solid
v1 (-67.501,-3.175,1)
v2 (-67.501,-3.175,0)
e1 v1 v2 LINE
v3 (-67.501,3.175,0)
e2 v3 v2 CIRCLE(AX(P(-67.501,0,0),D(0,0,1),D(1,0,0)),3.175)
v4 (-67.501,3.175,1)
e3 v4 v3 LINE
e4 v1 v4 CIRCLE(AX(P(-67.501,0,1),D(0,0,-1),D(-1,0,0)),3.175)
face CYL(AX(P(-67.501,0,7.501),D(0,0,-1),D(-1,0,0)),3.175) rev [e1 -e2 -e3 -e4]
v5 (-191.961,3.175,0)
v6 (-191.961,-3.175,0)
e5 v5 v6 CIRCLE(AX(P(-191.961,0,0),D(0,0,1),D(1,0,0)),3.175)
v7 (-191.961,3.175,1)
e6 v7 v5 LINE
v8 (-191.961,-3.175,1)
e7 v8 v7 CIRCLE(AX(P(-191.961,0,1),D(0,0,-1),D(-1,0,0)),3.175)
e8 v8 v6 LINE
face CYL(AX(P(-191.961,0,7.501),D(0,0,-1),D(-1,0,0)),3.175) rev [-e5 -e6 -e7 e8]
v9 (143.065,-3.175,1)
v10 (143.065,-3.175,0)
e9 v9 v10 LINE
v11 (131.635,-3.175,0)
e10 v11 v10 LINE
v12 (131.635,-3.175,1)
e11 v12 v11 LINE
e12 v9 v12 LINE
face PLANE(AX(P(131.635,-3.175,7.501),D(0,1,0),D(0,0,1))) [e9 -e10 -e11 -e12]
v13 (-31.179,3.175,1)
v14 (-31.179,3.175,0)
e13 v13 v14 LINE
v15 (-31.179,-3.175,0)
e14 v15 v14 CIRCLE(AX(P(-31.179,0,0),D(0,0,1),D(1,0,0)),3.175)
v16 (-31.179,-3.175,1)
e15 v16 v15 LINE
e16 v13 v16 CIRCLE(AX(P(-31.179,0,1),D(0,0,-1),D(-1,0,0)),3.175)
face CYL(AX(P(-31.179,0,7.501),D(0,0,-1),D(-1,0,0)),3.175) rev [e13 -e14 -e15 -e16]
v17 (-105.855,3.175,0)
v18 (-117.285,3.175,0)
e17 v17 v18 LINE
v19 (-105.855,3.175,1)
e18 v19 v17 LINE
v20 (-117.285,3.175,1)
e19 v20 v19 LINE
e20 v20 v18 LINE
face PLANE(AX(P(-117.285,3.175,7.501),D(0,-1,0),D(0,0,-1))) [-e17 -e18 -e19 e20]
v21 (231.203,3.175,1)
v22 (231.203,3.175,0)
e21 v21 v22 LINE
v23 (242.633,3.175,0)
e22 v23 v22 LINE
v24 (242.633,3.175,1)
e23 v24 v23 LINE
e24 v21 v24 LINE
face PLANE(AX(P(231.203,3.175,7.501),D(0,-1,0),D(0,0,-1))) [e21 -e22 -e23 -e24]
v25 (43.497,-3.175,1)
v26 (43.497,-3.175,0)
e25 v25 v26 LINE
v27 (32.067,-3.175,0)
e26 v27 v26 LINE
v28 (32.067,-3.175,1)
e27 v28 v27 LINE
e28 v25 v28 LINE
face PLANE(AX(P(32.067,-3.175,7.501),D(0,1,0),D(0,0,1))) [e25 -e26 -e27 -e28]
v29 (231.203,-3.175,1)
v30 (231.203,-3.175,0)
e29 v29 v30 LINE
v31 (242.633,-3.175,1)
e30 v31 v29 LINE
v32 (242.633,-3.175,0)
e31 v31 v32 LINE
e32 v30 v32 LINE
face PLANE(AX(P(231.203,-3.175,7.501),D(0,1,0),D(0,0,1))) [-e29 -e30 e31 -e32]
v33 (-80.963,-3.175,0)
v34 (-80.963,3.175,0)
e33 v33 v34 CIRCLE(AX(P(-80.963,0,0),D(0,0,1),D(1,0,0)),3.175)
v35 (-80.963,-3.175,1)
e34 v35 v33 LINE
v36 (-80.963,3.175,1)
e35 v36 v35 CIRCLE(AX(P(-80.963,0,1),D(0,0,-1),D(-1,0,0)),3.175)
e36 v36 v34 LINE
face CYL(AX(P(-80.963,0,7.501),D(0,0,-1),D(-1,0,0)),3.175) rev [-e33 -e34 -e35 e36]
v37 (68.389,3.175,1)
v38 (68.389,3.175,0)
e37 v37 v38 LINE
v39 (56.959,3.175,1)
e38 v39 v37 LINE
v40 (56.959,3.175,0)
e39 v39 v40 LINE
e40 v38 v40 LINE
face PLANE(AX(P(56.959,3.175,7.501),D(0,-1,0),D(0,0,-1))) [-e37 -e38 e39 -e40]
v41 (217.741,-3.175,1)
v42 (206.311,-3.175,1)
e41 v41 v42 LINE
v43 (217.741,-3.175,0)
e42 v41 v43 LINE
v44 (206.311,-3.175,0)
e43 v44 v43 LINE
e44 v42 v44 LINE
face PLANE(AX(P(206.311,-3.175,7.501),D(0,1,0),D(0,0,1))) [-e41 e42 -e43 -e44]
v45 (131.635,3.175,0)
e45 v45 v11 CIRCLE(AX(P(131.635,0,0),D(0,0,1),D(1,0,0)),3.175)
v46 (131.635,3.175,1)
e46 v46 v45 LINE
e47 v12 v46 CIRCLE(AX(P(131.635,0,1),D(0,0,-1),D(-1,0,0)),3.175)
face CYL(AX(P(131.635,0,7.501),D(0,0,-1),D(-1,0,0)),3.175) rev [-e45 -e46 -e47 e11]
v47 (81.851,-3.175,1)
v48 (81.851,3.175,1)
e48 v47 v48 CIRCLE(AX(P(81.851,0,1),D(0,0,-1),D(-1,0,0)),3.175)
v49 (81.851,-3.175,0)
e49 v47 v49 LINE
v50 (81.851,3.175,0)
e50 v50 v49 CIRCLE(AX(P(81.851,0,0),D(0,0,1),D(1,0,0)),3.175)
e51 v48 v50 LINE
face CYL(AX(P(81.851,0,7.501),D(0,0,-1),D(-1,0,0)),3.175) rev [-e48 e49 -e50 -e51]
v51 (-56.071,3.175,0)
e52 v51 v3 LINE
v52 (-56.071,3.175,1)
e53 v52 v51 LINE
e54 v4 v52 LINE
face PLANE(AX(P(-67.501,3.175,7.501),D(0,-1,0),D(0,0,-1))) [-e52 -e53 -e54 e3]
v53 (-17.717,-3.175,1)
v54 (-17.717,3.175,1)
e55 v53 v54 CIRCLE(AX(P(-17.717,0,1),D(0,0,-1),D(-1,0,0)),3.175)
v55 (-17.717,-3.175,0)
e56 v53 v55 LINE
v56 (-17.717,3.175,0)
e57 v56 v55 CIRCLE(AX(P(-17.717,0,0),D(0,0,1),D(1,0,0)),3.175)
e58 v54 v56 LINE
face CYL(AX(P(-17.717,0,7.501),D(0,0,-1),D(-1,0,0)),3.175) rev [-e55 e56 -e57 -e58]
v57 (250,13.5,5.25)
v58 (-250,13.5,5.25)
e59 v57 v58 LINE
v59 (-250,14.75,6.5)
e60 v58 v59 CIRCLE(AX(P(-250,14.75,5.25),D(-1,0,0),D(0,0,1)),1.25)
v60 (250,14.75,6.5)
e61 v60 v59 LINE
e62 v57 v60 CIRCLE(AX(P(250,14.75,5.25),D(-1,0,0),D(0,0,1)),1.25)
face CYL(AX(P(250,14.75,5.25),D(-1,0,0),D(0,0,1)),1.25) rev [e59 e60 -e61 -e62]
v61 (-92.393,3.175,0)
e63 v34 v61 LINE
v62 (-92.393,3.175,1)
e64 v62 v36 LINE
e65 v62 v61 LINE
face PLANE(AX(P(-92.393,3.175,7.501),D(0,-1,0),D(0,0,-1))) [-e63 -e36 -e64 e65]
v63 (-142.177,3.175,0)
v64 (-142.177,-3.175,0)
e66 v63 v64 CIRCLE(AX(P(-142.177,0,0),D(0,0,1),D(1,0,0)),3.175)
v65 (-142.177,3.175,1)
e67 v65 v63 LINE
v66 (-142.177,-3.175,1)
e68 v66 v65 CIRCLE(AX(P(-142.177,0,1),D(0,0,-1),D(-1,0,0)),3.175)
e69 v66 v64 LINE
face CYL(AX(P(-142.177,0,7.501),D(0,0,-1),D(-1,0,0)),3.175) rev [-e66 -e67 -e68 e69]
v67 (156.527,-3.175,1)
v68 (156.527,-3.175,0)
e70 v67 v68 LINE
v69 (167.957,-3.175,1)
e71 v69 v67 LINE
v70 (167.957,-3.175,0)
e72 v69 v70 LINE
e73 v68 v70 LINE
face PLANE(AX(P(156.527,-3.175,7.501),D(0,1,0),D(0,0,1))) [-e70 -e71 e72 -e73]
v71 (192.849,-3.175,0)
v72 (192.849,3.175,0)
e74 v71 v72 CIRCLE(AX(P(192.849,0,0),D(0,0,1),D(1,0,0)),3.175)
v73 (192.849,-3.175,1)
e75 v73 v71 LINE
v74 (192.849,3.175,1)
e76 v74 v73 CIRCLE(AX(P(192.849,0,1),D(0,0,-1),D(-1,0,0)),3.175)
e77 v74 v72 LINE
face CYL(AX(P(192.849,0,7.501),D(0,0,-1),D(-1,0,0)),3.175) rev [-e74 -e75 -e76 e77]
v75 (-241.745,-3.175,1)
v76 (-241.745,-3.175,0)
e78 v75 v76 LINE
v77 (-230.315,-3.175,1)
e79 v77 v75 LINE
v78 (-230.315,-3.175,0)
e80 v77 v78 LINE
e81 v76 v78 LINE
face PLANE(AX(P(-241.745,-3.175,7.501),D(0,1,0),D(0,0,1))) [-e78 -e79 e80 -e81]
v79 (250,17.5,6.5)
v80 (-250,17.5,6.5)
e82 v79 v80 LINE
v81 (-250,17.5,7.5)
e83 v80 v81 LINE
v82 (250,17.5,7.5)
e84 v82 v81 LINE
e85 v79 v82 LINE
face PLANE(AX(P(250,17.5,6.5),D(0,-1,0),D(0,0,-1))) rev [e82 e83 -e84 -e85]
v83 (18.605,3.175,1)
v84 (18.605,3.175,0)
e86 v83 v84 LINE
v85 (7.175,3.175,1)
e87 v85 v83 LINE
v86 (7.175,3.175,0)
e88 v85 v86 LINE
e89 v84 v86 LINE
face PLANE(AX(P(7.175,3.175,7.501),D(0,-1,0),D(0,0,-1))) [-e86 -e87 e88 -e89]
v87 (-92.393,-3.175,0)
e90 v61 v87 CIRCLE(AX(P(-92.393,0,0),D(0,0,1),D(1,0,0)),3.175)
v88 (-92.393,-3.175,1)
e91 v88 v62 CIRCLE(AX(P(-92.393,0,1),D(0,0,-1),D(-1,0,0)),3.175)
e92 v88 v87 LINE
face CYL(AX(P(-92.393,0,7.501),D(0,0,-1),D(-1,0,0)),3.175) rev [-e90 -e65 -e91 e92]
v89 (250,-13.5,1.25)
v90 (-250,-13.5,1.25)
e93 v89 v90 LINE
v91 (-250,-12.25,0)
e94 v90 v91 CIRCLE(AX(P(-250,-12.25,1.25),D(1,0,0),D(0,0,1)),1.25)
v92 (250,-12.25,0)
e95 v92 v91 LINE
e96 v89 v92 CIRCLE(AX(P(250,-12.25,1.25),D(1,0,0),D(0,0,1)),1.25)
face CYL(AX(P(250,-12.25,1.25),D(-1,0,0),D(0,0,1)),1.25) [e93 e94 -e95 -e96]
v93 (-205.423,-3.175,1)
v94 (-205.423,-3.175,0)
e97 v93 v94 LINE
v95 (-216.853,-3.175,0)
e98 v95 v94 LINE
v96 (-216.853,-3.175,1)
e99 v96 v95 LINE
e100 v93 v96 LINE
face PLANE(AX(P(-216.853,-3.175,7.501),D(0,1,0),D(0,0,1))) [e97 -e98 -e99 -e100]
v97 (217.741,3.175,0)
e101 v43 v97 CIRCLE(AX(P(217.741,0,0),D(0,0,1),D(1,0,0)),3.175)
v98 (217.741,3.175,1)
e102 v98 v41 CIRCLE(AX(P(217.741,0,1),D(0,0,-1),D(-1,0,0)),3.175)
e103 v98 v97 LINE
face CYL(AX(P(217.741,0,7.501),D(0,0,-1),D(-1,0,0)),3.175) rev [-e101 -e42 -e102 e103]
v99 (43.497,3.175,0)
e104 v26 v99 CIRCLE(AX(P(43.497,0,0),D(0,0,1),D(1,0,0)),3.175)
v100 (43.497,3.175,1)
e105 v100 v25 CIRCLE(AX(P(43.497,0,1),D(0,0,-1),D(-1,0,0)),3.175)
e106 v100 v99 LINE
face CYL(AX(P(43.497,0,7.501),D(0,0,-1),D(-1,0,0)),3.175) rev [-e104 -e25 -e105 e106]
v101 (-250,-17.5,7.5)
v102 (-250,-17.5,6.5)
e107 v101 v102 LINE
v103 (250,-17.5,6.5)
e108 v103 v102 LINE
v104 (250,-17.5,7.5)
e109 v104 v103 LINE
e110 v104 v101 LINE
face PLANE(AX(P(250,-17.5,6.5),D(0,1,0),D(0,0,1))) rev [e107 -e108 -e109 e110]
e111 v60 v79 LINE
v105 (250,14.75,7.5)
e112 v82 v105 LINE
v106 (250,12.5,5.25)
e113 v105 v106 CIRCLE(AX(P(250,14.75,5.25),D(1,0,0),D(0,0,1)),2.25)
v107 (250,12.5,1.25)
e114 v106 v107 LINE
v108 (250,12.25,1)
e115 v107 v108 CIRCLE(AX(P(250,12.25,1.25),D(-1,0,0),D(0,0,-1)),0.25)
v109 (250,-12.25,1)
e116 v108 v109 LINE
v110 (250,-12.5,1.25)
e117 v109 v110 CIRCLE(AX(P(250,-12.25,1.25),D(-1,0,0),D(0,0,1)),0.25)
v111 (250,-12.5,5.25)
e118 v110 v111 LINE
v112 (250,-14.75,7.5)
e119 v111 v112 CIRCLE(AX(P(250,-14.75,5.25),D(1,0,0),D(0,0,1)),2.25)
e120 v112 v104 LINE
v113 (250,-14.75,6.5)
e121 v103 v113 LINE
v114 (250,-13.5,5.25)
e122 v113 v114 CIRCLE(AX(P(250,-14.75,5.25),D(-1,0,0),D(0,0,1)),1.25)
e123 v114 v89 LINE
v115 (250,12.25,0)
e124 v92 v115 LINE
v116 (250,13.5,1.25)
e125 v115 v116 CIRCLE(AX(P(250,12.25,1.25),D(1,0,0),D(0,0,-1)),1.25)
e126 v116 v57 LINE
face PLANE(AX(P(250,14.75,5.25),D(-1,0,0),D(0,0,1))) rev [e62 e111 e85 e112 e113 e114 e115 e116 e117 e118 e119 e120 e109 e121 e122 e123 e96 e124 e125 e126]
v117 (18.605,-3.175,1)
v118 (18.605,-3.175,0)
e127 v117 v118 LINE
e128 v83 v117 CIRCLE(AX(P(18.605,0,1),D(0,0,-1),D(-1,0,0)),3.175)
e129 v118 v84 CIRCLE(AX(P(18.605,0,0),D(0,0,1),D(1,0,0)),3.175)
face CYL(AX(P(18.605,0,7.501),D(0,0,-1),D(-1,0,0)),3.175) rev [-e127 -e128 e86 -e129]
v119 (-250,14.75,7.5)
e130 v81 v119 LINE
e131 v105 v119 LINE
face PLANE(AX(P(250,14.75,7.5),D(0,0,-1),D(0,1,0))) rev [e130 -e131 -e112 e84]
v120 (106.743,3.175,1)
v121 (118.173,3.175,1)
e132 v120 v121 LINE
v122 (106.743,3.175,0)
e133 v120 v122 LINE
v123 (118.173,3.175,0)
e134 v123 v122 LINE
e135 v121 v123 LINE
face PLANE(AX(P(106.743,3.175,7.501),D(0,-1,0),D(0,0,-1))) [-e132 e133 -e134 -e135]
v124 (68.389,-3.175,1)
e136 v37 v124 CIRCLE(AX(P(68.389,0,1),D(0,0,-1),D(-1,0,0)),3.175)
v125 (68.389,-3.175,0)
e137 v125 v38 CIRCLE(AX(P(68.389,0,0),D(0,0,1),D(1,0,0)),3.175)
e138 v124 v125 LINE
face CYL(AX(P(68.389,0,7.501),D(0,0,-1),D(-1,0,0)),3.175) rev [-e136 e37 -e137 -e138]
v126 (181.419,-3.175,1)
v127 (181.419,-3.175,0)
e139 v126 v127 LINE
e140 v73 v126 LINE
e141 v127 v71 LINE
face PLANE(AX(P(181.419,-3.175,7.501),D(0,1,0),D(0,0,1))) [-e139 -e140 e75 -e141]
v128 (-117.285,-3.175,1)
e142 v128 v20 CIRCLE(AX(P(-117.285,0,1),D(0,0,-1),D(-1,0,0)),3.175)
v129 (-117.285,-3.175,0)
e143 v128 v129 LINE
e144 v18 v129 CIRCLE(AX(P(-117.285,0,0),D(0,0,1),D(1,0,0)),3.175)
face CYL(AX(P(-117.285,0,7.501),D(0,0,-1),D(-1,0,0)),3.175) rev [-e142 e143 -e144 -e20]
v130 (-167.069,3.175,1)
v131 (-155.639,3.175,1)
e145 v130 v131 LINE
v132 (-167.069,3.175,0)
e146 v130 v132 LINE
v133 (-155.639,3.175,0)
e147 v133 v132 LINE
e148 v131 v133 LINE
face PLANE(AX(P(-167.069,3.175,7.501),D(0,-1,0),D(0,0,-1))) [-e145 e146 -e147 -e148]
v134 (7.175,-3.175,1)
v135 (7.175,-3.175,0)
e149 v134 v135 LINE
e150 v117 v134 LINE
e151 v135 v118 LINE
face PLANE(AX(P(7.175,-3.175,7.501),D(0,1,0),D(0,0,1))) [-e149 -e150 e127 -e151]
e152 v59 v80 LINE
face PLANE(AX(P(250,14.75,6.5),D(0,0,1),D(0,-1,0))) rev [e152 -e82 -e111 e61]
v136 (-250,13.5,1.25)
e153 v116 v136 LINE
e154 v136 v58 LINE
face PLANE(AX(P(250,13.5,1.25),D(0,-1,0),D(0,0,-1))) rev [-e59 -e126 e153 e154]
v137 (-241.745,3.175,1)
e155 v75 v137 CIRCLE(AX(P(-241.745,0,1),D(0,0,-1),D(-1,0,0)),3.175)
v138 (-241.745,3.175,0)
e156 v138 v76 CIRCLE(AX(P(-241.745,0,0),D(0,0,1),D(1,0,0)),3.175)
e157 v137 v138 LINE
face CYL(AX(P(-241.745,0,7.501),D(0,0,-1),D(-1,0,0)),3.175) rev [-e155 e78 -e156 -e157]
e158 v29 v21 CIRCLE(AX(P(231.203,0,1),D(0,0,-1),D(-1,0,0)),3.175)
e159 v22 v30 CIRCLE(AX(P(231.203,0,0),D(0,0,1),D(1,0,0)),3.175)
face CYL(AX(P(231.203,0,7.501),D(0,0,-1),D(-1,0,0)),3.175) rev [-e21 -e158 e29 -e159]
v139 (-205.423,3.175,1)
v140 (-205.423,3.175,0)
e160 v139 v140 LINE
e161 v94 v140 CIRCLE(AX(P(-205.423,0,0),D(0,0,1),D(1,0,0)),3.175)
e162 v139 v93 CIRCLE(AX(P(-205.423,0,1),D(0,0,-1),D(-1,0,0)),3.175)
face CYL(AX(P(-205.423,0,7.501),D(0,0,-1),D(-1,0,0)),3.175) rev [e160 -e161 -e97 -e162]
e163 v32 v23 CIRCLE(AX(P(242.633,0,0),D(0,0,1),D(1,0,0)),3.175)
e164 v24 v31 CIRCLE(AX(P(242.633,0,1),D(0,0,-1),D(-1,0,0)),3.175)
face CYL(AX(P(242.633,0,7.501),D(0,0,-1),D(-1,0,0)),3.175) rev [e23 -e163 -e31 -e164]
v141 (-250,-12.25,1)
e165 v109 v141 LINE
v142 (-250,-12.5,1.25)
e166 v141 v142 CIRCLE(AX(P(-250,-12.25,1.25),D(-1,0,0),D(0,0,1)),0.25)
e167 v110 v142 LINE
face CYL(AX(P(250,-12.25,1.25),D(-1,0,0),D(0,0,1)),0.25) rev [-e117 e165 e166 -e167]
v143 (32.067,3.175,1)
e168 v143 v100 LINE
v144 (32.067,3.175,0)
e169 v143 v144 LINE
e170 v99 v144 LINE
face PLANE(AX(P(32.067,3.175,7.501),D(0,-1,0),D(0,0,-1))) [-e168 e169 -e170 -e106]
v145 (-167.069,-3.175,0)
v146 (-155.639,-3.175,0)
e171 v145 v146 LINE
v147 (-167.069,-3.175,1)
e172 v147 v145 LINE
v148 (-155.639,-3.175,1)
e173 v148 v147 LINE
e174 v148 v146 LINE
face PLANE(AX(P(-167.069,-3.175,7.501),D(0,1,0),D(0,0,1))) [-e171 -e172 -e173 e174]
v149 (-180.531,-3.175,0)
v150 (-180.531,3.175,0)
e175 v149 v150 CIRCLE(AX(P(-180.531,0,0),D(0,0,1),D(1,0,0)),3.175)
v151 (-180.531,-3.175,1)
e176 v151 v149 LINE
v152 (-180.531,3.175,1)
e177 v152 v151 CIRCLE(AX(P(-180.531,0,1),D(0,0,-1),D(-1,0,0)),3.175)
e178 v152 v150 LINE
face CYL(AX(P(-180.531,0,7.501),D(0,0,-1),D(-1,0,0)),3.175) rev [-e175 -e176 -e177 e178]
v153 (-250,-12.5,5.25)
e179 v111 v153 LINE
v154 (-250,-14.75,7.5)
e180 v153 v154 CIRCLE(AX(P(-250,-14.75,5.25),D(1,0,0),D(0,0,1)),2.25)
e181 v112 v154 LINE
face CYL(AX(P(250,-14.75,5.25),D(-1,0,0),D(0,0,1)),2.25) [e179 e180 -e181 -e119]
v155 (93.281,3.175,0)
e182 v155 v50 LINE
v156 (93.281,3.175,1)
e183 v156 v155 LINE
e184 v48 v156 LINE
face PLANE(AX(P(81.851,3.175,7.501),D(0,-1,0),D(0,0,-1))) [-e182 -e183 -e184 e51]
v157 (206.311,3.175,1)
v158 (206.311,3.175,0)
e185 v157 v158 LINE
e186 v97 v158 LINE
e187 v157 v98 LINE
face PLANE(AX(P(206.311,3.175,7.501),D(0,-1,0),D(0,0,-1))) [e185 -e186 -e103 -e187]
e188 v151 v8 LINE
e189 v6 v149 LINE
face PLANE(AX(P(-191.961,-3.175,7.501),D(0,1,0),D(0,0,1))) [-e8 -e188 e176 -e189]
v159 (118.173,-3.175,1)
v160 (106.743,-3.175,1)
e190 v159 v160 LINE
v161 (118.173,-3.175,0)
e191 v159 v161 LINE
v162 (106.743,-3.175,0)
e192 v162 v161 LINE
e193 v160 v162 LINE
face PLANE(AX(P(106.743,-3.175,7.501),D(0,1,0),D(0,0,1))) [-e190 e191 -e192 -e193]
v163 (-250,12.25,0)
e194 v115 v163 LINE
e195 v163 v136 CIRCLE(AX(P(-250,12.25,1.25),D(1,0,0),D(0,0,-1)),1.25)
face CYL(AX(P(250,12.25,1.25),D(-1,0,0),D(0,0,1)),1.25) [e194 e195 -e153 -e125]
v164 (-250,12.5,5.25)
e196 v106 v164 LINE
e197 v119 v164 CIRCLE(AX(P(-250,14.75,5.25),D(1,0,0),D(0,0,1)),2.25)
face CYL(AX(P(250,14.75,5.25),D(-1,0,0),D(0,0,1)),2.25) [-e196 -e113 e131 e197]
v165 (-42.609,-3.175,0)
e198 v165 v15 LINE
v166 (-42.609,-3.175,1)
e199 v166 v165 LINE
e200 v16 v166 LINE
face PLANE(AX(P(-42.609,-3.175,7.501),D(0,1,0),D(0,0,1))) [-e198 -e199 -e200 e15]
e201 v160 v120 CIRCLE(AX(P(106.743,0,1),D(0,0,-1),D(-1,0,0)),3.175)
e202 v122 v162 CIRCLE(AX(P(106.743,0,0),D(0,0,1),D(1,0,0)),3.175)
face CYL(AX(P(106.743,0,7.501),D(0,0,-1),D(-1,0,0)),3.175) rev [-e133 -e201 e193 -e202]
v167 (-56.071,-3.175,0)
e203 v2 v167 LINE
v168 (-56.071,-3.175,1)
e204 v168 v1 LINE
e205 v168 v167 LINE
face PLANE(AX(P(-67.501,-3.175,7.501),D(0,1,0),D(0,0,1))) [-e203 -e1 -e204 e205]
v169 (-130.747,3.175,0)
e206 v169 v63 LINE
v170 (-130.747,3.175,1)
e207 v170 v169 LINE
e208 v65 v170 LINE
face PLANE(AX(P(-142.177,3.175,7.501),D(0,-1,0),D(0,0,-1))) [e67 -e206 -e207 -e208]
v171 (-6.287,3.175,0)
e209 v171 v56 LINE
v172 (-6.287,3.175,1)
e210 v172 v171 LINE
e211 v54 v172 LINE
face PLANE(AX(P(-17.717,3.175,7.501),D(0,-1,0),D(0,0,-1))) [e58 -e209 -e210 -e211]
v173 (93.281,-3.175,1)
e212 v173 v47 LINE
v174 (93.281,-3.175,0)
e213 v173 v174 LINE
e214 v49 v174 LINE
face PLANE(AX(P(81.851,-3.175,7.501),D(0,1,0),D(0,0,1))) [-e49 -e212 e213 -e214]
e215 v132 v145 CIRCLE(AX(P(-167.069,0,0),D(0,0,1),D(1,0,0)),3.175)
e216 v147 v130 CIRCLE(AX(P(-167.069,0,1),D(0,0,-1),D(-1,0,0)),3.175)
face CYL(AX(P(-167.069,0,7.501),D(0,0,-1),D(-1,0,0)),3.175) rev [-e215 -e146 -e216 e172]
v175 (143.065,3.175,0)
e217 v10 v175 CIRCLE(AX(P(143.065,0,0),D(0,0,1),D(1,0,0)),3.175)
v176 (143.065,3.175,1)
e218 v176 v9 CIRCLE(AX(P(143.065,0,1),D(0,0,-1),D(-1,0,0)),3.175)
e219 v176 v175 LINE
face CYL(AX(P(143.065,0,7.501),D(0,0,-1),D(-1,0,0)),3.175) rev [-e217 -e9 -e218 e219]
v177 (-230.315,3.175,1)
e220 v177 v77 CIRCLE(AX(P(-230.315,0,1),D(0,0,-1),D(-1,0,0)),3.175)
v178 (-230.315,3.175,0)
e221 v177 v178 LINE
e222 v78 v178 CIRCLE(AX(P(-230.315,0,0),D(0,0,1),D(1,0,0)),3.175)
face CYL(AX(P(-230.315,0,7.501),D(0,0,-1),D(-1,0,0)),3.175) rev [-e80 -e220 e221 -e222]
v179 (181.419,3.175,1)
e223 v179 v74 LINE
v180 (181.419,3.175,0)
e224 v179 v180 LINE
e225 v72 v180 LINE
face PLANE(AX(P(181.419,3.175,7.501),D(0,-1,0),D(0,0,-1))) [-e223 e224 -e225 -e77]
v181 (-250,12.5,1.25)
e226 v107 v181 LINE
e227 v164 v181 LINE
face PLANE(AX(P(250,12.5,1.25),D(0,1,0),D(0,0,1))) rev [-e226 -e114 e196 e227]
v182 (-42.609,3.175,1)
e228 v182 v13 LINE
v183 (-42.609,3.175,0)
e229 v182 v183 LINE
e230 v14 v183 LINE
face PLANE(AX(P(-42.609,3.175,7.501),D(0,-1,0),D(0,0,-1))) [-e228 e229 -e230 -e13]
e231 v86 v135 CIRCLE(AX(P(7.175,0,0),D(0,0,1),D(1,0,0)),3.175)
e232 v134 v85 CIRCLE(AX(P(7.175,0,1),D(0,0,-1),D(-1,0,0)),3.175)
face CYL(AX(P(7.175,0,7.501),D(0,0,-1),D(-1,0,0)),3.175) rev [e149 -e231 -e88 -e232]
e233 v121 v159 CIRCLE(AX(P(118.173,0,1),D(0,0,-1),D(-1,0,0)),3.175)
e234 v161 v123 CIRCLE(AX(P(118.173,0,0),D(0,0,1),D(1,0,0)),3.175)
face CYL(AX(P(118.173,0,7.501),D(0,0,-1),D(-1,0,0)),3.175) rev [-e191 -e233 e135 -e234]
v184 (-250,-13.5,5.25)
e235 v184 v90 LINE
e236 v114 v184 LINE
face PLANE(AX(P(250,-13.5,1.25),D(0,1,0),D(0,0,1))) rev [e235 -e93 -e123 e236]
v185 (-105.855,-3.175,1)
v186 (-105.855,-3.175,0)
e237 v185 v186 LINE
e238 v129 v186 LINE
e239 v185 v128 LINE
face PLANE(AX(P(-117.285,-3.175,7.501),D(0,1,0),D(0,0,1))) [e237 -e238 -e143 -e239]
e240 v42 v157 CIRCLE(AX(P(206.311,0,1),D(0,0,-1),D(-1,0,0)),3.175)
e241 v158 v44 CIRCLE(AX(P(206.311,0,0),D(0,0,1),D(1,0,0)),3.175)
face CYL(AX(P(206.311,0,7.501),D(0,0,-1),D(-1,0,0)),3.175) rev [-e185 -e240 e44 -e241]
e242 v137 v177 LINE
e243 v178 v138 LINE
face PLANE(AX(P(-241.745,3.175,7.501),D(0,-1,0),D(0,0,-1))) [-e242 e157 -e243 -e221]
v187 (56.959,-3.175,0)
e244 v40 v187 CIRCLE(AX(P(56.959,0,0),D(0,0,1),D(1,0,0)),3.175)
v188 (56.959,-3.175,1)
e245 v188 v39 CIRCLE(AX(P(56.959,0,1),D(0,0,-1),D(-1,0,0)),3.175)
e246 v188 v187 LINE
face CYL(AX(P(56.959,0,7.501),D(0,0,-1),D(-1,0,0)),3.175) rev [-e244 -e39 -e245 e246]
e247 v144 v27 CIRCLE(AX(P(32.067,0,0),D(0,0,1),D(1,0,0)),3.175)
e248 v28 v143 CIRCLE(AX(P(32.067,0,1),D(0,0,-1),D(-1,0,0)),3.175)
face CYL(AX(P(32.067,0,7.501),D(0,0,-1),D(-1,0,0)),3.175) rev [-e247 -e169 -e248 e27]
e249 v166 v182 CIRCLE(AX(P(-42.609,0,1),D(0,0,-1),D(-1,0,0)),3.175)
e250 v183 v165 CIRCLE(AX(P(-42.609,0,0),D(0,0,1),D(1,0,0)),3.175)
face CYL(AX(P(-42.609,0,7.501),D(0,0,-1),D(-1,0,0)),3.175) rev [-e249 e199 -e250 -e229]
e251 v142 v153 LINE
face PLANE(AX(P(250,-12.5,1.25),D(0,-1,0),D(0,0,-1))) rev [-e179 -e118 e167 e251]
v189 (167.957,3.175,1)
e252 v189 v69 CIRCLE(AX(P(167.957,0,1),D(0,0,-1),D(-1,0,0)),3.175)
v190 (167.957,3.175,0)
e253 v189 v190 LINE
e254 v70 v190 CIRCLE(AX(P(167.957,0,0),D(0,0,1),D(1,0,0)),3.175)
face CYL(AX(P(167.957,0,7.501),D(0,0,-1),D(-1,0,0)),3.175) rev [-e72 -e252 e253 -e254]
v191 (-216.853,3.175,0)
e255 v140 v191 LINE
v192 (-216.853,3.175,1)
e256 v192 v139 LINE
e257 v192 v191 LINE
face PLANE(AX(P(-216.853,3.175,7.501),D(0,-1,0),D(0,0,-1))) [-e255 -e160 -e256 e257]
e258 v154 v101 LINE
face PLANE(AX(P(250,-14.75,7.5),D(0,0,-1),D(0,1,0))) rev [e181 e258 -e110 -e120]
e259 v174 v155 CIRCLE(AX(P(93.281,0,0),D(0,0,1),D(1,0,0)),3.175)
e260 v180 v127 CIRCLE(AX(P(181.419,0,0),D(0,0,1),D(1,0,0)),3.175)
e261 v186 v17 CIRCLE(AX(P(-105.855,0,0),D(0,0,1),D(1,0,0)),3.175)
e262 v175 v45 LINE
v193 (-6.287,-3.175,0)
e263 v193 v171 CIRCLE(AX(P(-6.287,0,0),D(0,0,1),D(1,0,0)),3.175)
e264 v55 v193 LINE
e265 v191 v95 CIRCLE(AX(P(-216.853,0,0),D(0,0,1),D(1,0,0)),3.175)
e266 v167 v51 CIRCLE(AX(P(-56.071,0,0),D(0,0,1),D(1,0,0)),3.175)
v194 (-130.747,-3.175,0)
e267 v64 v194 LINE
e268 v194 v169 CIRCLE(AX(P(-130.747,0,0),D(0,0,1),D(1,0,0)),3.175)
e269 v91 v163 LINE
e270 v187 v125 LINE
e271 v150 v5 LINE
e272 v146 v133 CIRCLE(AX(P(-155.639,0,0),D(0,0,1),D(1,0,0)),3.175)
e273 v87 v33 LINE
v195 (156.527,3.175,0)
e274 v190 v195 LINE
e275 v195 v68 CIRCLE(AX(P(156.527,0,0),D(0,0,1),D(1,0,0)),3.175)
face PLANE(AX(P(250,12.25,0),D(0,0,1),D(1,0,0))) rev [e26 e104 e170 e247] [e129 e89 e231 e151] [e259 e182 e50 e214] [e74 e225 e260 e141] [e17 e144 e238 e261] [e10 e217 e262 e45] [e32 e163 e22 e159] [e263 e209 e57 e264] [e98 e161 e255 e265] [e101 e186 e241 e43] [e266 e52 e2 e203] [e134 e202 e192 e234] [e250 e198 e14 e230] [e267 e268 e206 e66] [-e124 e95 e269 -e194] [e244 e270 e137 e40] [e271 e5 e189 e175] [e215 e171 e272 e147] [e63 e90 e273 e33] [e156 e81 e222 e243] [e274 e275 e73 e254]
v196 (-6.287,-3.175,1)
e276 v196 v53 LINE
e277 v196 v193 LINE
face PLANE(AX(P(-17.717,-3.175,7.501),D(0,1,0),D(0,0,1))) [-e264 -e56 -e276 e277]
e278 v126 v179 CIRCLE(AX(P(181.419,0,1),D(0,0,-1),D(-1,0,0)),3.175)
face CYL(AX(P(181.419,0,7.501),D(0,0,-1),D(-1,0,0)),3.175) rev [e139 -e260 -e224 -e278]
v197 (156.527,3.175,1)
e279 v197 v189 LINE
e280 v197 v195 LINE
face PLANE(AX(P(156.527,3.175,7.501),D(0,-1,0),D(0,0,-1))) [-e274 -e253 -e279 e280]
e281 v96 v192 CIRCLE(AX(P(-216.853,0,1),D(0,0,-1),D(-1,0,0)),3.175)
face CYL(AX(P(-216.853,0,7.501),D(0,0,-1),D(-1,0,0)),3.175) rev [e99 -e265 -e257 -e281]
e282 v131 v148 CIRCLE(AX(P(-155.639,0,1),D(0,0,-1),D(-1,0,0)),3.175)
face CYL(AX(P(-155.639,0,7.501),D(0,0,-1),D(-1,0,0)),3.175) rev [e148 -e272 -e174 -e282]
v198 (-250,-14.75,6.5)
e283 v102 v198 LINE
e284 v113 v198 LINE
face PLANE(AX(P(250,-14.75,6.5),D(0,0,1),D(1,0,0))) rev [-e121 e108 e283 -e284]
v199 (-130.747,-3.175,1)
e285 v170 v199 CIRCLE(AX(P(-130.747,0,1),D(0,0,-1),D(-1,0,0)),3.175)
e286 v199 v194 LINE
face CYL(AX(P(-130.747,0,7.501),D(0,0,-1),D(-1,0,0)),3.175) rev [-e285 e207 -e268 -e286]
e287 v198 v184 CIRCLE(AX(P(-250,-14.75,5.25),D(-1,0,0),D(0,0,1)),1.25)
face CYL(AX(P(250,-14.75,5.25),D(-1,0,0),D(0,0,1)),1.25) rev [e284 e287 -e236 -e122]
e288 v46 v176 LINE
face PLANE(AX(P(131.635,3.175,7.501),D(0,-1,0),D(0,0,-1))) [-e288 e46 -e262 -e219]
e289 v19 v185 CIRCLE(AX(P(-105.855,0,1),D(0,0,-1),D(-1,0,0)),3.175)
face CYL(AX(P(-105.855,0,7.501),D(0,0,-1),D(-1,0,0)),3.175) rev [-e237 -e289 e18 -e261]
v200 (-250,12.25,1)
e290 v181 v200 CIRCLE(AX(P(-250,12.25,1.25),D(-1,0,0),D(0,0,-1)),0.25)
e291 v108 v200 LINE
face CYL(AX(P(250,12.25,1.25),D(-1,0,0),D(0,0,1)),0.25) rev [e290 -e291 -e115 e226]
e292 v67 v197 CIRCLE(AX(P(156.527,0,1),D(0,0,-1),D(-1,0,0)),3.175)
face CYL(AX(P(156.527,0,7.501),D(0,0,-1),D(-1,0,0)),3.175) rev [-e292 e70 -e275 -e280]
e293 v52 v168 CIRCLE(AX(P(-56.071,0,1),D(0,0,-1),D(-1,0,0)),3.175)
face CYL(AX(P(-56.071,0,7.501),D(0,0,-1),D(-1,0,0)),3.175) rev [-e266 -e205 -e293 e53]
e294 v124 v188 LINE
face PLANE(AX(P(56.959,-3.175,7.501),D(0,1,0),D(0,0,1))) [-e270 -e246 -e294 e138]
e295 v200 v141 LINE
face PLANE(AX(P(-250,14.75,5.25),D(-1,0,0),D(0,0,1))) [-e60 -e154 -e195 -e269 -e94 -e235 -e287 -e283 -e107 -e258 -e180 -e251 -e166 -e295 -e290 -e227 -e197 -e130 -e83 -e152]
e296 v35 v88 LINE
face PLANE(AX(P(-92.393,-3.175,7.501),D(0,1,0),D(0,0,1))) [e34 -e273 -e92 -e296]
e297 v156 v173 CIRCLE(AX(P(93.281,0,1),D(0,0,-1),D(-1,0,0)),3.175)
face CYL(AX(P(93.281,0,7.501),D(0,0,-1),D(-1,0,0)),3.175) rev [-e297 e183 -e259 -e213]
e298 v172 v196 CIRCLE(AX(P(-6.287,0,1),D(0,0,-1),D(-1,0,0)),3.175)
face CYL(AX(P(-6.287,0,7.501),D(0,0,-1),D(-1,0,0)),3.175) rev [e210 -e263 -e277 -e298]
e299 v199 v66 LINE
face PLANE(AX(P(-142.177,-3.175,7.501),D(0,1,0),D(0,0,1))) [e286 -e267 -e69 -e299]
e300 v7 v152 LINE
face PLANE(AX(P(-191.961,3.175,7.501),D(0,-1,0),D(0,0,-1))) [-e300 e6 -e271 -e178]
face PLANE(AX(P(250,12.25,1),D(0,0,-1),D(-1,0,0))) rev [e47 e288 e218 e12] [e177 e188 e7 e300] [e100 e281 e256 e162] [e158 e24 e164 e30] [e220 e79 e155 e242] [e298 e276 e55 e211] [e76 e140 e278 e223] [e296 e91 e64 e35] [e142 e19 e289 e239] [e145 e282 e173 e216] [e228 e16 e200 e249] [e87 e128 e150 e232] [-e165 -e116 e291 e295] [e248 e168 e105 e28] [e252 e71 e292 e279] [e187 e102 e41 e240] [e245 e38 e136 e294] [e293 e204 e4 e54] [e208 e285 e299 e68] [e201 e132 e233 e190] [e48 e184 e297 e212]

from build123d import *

# Parameters (mm, degrees)
STRUCTURAL_MEMBER1_DEPTH = 500
CUT_EXTRUDE1_REACH       = 252.724
LPATTERN1_DEPTH          = 1


# Read off the part's stored shape, not the designer's step: LPattern1
with BuildPart() as part:
    # Sketch2 → Structural Member1 (new body)
    with BuildSketch(Plane(origin=(-250, 0, 0), x_dir=(0, 0, -1), z_dir=(1, 0, 0))):
        with BuildLine():
            Line((0, 12.25), (0, -12.25))
            ThreePointArc((0, -12.25), (-0.366116524, -13.133883476), (-1.25, -13.5))
            Line((-1.25, -13.5), (-5.25, -13.5))
            ThreePointArc((-5.25, -13.5), (-6.133883476, -13.866116524), (-6.5, -14.75))
            Line((-6.5, -14.75), (-6.5, -17.5))
            Line((-6.5, -17.5), (-7.5, -17.5))
            Line((-7.5, -17.5), (-7.5, -14.75))
            ThreePointArc((-7.5, -14.75), (-6.840990258, -13.159009742), (-5.25, -12.5))
            Line((-5.25, -12.5), (-1.25, -12.5))
            ThreePointArc((-1.25, -12.5), (-1.073223305, -12.426776695), (-1, -12.25))
            Line((-1, -12.25), (-1, 12.25))
            ThreePointArc((-1, 12.25), (-1.073223305, 12.426776695), (-1.25, 12.5))
            Line((-1.25, 12.5), (-5.25, 12.5))
            ThreePointArc((-5.25, 12.5), (-6.840990258, 13.159009742), (-7.5, 14.75))
            Line((-7.5, 14.75), (-7.5, 17.5))
            Line((-7.5, 17.5), (-6.5, 17.5))
            Line((-6.5, 17.5), (-6.5, 14.75))
            ThreePointArc((-6.5, 14.75), (-6.133883476, 13.866116524), (-5.25, 13.5))
            Line((-5.25, 13.5), (-1.25, 13.5))
            ThreePointArc((-1.25, 13.5), (-0.366116524, 13.133883476), (0, 12.25))
        make_face()
    extrude(amount=STRUCTURAL_MEMBER1_DEPTH)

    # Sketch3 → Cut-Extrude1 (cut, up to next)
    with BuildSketch(Plane.XY, mode=Mode.PRIVATE) as cut_extrude1_sk1:
        with BuildLine():
            Line((-241.745, 3.175), (-230.315, 3.175))
            ThreePointArc((-230.315, 3.175), (-227.14, 0), (-230.315, -3.175))
            Line((-230.315, -3.175), (-241.745, -3.175))
            ThreePointArc((-241.745, -3.175), (-244.92, 0), (-241.745, 3.175))
        make_face()
    cut_extrude1_tool1 = extrude(cut_extrude1_sk1.sketch, amount=CUT_EXTRUDE1_REACH, mode=Mode.PRIVATE) & part.part
    add(cut_extrude1_tool1.solids().sort_by_distance((-236.03, 0, 0))[0], mode=Mode.SUBTRACT)

    # LPattern1 outline → LPattern1 (cut)
    with BuildSketch(Plane.XY):
        with BuildLine():
            Line((-216.853, -3.175), (-205.423, -3.175))
            ThreePointArc((-205.423, -3.175), (-202.248, 0), (-205.423, 3.175))
            Line((-205.423, 3.175), (-216.853, 3.175))
            ThreePointArc((-216.853, 3.175), (-220.028, 0), (-216.853, -3.175))
        make_face()
        with BuildLine():
            Line((-191.961, -3.175), (-180.531, -3.175))
            ThreePointArc((-180.531, -3.175), (-177.356, 0), (-180.531, 3.175))
            Line((-180.531, 3.175), (-191.961, 3.175))
            ThreePointArc((-191.961, 3.175), (-195.136, 0), (-191.961, -3.175))
        make_face()
        with BuildLine():
            Line((-167.069, -3.175), (-155.639, -3.175))
            ThreePointArc((-155.639, -3.175), (-152.464, 0), (-155.639, 3.175))
            Line((-155.639, 3.175), (-167.069, 3.175))
            ThreePointArc((-167.069, 3.175), (-170.244, 0), (-167.069, -3.175))
        make_face()
        with BuildLine():
            Line((-142.177, -3.175), (-130.747, -3.175))
            ThreePointArc((-130.747, -3.175), (-127.572, 0), (-130.747, 3.175))
            Line((-130.747, 3.175), (-142.177, 3.175))
            ThreePointArc((-142.177, 3.175), (-145.352, 0), (-142.177, -3.175))
        make_face()
        with BuildLine():
            Line((-117.285, -3.175), (-105.855, -3.175))
            ThreePointArc((-105.855, -3.175), (-102.68, 0), (-105.855, 3.175))
            Line((-105.855, 3.175), (-117.285, 3.175))
            ThreePointArc((-117.285, 3.175), (-120.46, 0), (-117.285, -3.175))
        make_face()
        with BuildLine():
            Line((-92.393, -3.175), (-80.963, -3.175))
            ThreePointArc((-80.963, -3.175), (-77.788, 0), (-80.963, 3.175))
            Line((-80.963, 3.175), (-92.393, 3.175))
            ThreePointArc((-92.393, 3.175), (-95.568, 0), (-92.393, -3.175))
        make_face()
        with BuildLine():
            Line((-67.501, -3.175), (-56.071, -3.175))
            ThreePointArc((-56.071, -3.175), (-52.896, 0), (-56.071, 3.175))
            Line((-56.071, 3.175), (-67.501, 3.175))
            ThreePointArc((-67.501, 3.175), (-70.676, 0), (-67.501, -3.175))
        make_face()
        with BuildLine():
            Line((-42.609, -3.175), (-31.179, -3.175))
            ThreePointArc((-31.179, -3.175), (-28.004, 0), (-31.179, 3.175))
            Line((-31.179, 3.175), (-42.609, 3.175))
            ThreePointArc((-42.609, 3.175), (-45.784, 0), (-42.609, -3.175))
        make_face()
        with BuildLine():
            Line((-17.717, -3.175), (-6.287, -3.175))
            ThreePointArc((-6.287, -3.175), (-3.112, 0), (-6.287, 3.175))
            Line((-6.287, 3.175), (-17.717, 3.175))
            ThreePointArc((-17.717, 3.175), (-20.892, 0), (-17.717, -3.175))
        make_face()
        with BuildLine():
            Line((7.175, -3.175), (18.605, -3.175))
            ThreePointArc((18.605, -3.175), (21.78, 0), (18.605, 3.175))
            Line((18.605, 3.175), (7.175, 3.175))
            ThreePointArc((7.175, 3.175), (4, 0), (7.175, -3.175))
        make_face()
        with BuildLine():
            Line((32.067, -3.175), (43.497, -3.175))
            ThreePointArc((43.497, -3.175), (46.672, 0), (43.497, 3.175))
            Line((43.497, 3.175), (32.067, 3.175))
            ThreePointArc((32.067, 3.175), (28.892, 0), (32.067, -3.175))
        make_face()
        with BuildLine():
            Line((56.959, -3.175), (68.389, -3.175))
            ThreePointArc((68.389, -3.175), (71.564, 0), (68.389, 3.175))
            Line((68.389, 3.175), (56.959, 3.175))
            ThreePointArc((56.959, 3.175), (53.784, 0), (56.959, -3.175))
        make_face()
        with BuildLine():
            Line((81.851, -3.175), (93.281, -3.175))
            ThreePointArc((93.281, -3.175), (96.456, 0), (93.281, 3.175))
            Line((93.281, 3.175), (81.851, 3.175))
            ThreePointArc((81.851, 3.175), (78.676, 0), (81.851, -3.175))
        make_face()
        with BuildLine():
            Line((106.743, -3.175), (118.173, -3.175))
            ThreePointArc((118.173, -3.175), (121.348, 0), (118.173, 3.175))
            Line((118.173, 3.175), (106.743, 3.175))
            ThreePointArc((106.743, 3.175), (103.568, 0), (106.743, -3.175))
        make_face()
        with BuildLine():
            Line((131.635, -3.175), (143.065, -3.175))
            ThreePointArc((143.065, -3.175), (146.24, 0), (143.065, 3.175))
            Line((143.065, 3.175), (131.635, 3.175))
            ThreePointArc((131.635, 3.175), (128.46, 0), (131.635, -3.175))
        make_face()
        with BuildLine():
            Line((156.527, -3.175), (167.957, -3.175))
            ThreePointArc((167.957, -3.175), (171.132, 0), (167.957, 3.175))
            Line((167.957, 3.175), (156.527, 3.175))
            ThreePointArc((156.527, 3.175), (153.352, 0), (156.527, -3.175))
        make_face()
        with BuildLine():
            Line((181.419, -3.175), (192.849, -3.175))
            ThreePointArc((192.849, -3.175), (196.024, 0), (192.849, 3.175))
            Line((192.849, 3.175), (181.419, 3.175))
            ThreePointArc((181.419, 3.175), (178.244, 0), (181.419, -3.175))
        make_face()
        with BuildLine():
            Line((206.311, -3.175), (217.741, -3.175))
            ThreePointArc((217.741, -3.175), (220.916, 0), (217.741, 3.175))
            Line((217.741, 3.175), (206.311, 3.175))
            ThreePointArc((206.311, 3.175), (203.136, 0), (206.311, -3.175))
        make_face()
        with BuildLine():
            Line((231.203, -3.175), (242.633, -3.175))
            ThreePointArc((242.633, -3.175), (245.808, 0), (242.633, 3.175))
            Line((242.633, 3.175), (231.203, 3.175))
            ThreePointArc((231.203, 3.175), (228.028, 0), (231.203, -3.175))
        make_face()
    extrude(amount=LPATTERN1_DEPTH, mode=Mode.SUBTRACT)


solid = part.part
